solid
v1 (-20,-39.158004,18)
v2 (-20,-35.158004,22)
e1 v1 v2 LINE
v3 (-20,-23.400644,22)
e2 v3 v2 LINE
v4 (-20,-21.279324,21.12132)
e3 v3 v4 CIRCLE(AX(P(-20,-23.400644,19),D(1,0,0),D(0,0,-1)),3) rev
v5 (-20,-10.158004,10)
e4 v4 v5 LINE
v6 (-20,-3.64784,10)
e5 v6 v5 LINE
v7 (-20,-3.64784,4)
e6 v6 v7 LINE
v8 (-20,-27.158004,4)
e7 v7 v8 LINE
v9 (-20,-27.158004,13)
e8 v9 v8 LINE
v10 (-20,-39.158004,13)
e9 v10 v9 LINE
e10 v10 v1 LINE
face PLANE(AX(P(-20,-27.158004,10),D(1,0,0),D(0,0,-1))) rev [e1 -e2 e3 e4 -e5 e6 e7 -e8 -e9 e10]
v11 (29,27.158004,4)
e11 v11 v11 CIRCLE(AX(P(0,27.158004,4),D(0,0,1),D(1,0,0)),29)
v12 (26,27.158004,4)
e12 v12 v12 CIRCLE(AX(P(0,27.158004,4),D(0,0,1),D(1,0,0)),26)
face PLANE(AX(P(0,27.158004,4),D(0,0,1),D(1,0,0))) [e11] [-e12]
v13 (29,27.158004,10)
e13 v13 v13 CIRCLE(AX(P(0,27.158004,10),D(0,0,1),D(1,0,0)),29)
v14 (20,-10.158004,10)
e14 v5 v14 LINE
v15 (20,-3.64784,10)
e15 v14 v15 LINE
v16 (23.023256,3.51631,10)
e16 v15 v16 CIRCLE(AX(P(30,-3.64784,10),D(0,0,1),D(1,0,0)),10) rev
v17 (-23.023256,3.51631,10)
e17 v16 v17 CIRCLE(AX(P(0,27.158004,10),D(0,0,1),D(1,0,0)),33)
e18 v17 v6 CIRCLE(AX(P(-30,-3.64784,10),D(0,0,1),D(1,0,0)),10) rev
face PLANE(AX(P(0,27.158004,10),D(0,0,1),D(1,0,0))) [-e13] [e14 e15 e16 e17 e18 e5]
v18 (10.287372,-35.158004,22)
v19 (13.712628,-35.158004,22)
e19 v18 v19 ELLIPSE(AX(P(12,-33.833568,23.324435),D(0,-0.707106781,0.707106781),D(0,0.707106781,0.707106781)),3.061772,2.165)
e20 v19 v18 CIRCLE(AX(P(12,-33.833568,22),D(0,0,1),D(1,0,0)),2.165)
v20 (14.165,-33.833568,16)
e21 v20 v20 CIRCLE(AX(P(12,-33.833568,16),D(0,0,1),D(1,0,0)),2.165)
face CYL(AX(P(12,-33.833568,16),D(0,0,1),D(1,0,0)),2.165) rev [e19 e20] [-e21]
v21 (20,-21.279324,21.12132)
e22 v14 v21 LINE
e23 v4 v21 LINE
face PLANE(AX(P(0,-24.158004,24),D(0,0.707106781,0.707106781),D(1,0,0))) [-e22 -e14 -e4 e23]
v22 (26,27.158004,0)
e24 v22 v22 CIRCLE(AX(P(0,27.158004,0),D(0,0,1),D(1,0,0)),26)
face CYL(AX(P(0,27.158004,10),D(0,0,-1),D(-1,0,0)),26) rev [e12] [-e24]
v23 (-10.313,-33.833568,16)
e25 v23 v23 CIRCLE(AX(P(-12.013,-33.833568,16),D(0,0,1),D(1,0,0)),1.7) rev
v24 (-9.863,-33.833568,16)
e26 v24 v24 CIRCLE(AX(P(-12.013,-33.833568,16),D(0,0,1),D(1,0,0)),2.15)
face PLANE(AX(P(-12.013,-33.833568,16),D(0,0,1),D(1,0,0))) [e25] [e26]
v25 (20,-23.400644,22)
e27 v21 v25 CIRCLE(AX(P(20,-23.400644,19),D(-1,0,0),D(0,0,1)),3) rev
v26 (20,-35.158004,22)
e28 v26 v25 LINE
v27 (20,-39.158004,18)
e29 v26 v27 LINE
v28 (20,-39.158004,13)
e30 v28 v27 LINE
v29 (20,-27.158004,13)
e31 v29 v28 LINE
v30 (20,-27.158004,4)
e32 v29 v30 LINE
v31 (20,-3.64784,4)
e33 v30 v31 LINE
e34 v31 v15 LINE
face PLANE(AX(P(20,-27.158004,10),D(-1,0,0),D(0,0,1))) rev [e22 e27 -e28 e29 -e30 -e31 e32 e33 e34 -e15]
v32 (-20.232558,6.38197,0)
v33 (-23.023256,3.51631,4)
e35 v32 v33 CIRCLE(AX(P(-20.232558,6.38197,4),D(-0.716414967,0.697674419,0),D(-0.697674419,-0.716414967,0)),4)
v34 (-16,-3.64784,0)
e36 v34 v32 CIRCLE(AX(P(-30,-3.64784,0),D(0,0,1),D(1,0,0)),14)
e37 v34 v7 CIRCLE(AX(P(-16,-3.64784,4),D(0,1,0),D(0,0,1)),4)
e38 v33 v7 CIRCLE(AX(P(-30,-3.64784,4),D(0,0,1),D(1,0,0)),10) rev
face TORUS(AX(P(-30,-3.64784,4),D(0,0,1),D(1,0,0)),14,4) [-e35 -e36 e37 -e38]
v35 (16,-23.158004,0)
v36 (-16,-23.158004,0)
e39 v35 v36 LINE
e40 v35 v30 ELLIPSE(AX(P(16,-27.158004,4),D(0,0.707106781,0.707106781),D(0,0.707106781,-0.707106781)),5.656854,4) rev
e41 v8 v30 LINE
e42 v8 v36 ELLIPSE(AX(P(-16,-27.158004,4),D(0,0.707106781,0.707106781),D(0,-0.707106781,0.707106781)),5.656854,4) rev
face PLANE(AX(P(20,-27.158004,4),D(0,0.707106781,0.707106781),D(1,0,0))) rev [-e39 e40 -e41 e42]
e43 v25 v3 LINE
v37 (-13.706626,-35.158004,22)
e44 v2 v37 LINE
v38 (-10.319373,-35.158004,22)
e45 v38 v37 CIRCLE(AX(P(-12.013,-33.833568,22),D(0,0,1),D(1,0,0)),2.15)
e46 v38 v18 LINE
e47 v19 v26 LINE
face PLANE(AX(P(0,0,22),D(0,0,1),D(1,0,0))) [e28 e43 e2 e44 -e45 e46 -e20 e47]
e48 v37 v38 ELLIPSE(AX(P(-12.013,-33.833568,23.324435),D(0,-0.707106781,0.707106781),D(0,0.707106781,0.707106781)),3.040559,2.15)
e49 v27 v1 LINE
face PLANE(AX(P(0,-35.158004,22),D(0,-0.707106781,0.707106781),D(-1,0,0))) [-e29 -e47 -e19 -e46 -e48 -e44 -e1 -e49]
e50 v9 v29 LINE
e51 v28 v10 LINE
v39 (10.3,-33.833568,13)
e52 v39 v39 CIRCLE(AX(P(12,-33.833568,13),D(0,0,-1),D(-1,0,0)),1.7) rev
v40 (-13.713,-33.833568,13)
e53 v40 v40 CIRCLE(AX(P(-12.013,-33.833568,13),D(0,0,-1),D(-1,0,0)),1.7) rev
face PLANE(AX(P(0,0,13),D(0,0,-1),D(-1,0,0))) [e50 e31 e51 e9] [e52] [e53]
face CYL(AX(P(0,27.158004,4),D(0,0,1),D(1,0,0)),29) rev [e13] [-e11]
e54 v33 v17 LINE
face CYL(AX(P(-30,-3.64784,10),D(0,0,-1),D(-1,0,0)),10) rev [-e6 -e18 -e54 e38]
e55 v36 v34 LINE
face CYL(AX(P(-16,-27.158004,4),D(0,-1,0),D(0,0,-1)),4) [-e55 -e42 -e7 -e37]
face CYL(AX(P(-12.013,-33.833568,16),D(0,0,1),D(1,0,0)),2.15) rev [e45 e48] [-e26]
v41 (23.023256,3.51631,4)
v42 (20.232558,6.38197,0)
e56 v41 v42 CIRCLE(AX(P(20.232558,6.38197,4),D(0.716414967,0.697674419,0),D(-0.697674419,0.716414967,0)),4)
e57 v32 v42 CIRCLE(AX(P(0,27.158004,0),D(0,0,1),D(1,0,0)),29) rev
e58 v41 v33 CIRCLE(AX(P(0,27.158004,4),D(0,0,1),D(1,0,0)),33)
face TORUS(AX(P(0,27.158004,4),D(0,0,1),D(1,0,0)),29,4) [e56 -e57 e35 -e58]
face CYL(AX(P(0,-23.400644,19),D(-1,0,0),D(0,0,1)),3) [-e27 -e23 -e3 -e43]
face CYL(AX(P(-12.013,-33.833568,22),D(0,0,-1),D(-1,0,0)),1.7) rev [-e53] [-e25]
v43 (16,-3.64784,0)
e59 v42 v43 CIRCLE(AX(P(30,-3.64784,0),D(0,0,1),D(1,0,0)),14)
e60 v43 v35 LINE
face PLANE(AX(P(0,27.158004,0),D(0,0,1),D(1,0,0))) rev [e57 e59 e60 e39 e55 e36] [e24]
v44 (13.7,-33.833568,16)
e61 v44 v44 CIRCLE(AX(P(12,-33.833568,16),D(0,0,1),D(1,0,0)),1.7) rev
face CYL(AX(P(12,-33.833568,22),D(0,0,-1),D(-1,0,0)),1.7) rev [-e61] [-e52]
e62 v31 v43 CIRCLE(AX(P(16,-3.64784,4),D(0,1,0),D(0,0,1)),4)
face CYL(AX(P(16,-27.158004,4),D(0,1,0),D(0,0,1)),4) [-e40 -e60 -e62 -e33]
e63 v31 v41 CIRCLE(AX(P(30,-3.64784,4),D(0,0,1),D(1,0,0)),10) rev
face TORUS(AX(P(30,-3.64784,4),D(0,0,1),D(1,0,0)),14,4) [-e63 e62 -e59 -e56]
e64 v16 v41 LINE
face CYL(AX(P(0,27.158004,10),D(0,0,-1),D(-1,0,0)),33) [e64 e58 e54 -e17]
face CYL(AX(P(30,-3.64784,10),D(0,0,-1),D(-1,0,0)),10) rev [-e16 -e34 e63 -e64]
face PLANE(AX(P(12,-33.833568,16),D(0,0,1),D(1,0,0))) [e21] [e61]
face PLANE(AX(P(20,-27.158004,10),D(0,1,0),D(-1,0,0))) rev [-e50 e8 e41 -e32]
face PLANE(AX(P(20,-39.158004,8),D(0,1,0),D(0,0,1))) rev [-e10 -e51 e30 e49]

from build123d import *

# Parameters (mm, degrees)
SKETCH_1_R          = 26
EXTRUDE_1_DEPTH     = 10
SKETCH_3_R          = 29
CUT_EXTRUDE_1_DEPTH = 6
SKETCH_4_W          = 40
SKETCH_4_H          = 12
EXTRUDE_2_DEPTH     = 12
SKETCH_5_W          = 40
SKETCH_5_H          = 12
EXTRUDE_3_DEPTH     = 2
SKETCH_6_W          = 40
SKETCH_6_H          = 12
EXTRUDE_4_DEPTH     = 3
CHAMFER_1_SIZE      = 14
SKETCH_7_R          = 1.7
CUT_EXTRUDE_2_DEPTH = 14
SKETCH_8_R          = 2.15
SKETCH_8_R_2        = 2.165
CUT_EXTRUDE_3_DEPTH = 6
SKETCH_9_W          = 40
SKETCH_9_H          = 12
CUT_EXTRUDE_4_DEPTH = 5
CHAMFER_2_SIZE      = 4
CHAMFER_3_SIZE      = 4
FILLET_5_R          = 10
FILLET_6_R          = 4
FILLET_7_R          = 3


with BuildPart() as part:
    # 草图1 → 凸台-拉伸1 (new body)
    with BuildSketch(Plane.XY):
        with BuildLine():
            Line((20, -27.158003748), (-20, -27.158003748))
            Line((-20, -27.158003748), (-20, 0.909194251))
            ThreePointArc((-20, 0.909194251), (0, 60.158003748), (20, 0.909194251))
            Line((20, 0.909194251), (20, -27.158003748))
        make_face()
        with Locations((0, 27.158003748)):
            Circle(SKETCH_1_R, mode=Mode.SUBTRACT)
    extrude(amount=EXTRUDE_1_DEPTH)

    # 草图3 → 切除-拉伸1 (cut)
    with BuildSketch(Plane.XY.offset(10)):
        with Locations((0, 27.158003748)):
            Circle(SKETCH_3_R)
    extrude(amount=-CUT_EXTRUDE_1_DEPTH, mode=Mode.SUBTRACT)



with BuildPart() as body_2:
    # 草图4 → 凸台-拉伸2 (new body)
    with BuildSketch(Plane.XY.offset(10)):
        with Locations((0, -33.158003748)):
            Rectangle(SKETCH_4_W, SKETCH_4_H)
    extrude(amount=EXTRUDE_2_DEPTH)


with BuildPart() as part_1:
    add(part.part)

    add(body_2.part)  # 凸台-拉伸3 merges body 2
    # 草图5 → 凸台-拉伸3 (add)
    with BuildSketch(Plane(origin=(0, 0, 10), x_dir=(-1, 0, 0), z_dir=(0, 0, -1))):
        with Locations((0, -33.158003748)):
            Rectangle(SKETCH_5_W, SKETCH_5_H)
    extrude(amount=EXTRUDE_3_DEPTH)

    # 草图6 → 凸台-拉伸4 (add)
    with BuildSketch(Plane(origin=(0, -27.158003748, 0), x_dir=(1, 0, 0), z_dir=(0, 1, 0))):
        with Locations((0, -16)):
            Rectangle(SKETCH_6_W, SKETCH_6_H)
    extrude(amount=EXTRUDE_4_DEPTH)

    # 倒角1
    # the kernel refuses this chamfer: 14 mm, written as the material it adds along each edge
    with BuildSketch(Plane(origin=(-20, -24.158003748, 10), x_dir=(0, -0.027495876610586365, 0.9996219169112968), z_dir=(1, 0, 0))) as chamfer_1_piece_1_section:
        Polygon((CHAMFER_1_SIZE * 0.999621916911, -CHAMFER_1_SIZE * 0.0274958766106), (-CHAMFER_1_SIZE * 0.0274958766106, -CHAMFER_1_SIZE * 0.999621916911), (0, 0), align=None)
    chamfer_1_piece_1 = extrude(amount=40, mode=Mode.PRIVATE)
    chamfer_1_piece_1 = split(chamfer_1_piece_1, bisect_by=Plane(origin=(0, -19.403075602, 22), z_dir=(0, 0, -1)), keep=Keep.TOP, mode=Mode.PRIVATE)
    add(chamfer_1_piece_1)

    # 草图7 → 切除-拉伸2 (cut)
    with BuildSketch(Plane(origin=(0, 0, 8), x_dir=(-1, 0, 0), z_dir=(0, 0, -1))):
        with Locations((-12, -33.833568363)):
            Circle(SKETCH_7_R)
        with Locations((12.012999622, -33.833568363)):
            Circle(SKETCH_7_R)
    extrude(amount=-CUT_EXTRUDE_2_DEPTH, mode=Mode.SUBTRACT)

    # 草图8 → 切除-拉伸3 (cut)
    with BuildSketch(Plane.XY.offset(22)):
        with Locations((-12.012999622, -33.833568363)):
            Circle(SKETCH_8_R)
        with Locations((12, -33.833568363)):
            Circle(SKETCH_8_R_2)
    extrude(amount=-CUT_EXTRUDE_3_DEPTH, mode=Mode.SUBTRACT)

    # 草图9 → 切除-拉伸4 (cut)
    with BuildSketch(Plane(origin=(0, 0, 8), x_dir=(-1, 0, 0), z_dir=(0, 0, -1))):
        with Locations((0, -33.158003748)):
            Rectangle(SKETCH_9_W, SKETCH_9_H)
    extrude(amount=-CUT_EXTRUDE_4_DEPTH, mode=Mode.SUBTRACT)

    # 倒角2
    # the kernel refuses this chamfer: 4 mm, written as the material it takes off along each edge
    with BuildSketch(Plane(origin=(30.286731952, -39.158003748, 22), x_dir=(0, 0.9996219169112968, 0.02749587661058651), z_dir=(-1, 0, 0))) as chamfer_2_piece_1:
        Polygon((CHAMFER_2_SIZE * 0.999621916911, CHAMFER_2_SIZE * 0.0274958766106), (-CHAMFER_2_SIZE * 0.0274958766106, CHAMFER_2_SIZE * 0.999621916911), (0, 0), align=None)
    extrude(amount=60.573463904, mode=Mode.SUBTRACT)

    # 倒角3
    chamfer_3_edges = [part_1.edges().sort_by_distance(p)[0] for p in [
        (0, -27.158003748, 0),
    ]]
    chamfer(chamfer_3_edges, length=CHAMFER_3_SIZE)

    # 圆角5
    fillet_5_edges = [part_1.edges().sort_by_distance(p)[0] for p in [
        (-20, 0.909194251, 5),
        (20, 0.909194251, 5),
    ]]
    fillet(fillet_5_edges, radius=FILLET_5_R)

    # 圆角6
    fillet_6_edges = [part_1.edges().sort_by_distance(p)[0] for p in [
        (0, 60.158003748, 0),
        (-20, -13.402921801, 0),
        (-20.786763819, 0.240126076, 0),
        (20.786763819, 0.240126076, 0),
        (20, -13.402921801, 0),
    ]]
    fillet(fillet_6_edges, radius=FILLET_6_R)

    # 圆角7
    fillet_7_edges = [part_1.edges().sort_by_distance(p)[0] for p in [
        (0, -22.158003748, 22),
    ]]
    fillet(fillet_7_edges, radius=FILLET_7_R)


solid = part_1.part
